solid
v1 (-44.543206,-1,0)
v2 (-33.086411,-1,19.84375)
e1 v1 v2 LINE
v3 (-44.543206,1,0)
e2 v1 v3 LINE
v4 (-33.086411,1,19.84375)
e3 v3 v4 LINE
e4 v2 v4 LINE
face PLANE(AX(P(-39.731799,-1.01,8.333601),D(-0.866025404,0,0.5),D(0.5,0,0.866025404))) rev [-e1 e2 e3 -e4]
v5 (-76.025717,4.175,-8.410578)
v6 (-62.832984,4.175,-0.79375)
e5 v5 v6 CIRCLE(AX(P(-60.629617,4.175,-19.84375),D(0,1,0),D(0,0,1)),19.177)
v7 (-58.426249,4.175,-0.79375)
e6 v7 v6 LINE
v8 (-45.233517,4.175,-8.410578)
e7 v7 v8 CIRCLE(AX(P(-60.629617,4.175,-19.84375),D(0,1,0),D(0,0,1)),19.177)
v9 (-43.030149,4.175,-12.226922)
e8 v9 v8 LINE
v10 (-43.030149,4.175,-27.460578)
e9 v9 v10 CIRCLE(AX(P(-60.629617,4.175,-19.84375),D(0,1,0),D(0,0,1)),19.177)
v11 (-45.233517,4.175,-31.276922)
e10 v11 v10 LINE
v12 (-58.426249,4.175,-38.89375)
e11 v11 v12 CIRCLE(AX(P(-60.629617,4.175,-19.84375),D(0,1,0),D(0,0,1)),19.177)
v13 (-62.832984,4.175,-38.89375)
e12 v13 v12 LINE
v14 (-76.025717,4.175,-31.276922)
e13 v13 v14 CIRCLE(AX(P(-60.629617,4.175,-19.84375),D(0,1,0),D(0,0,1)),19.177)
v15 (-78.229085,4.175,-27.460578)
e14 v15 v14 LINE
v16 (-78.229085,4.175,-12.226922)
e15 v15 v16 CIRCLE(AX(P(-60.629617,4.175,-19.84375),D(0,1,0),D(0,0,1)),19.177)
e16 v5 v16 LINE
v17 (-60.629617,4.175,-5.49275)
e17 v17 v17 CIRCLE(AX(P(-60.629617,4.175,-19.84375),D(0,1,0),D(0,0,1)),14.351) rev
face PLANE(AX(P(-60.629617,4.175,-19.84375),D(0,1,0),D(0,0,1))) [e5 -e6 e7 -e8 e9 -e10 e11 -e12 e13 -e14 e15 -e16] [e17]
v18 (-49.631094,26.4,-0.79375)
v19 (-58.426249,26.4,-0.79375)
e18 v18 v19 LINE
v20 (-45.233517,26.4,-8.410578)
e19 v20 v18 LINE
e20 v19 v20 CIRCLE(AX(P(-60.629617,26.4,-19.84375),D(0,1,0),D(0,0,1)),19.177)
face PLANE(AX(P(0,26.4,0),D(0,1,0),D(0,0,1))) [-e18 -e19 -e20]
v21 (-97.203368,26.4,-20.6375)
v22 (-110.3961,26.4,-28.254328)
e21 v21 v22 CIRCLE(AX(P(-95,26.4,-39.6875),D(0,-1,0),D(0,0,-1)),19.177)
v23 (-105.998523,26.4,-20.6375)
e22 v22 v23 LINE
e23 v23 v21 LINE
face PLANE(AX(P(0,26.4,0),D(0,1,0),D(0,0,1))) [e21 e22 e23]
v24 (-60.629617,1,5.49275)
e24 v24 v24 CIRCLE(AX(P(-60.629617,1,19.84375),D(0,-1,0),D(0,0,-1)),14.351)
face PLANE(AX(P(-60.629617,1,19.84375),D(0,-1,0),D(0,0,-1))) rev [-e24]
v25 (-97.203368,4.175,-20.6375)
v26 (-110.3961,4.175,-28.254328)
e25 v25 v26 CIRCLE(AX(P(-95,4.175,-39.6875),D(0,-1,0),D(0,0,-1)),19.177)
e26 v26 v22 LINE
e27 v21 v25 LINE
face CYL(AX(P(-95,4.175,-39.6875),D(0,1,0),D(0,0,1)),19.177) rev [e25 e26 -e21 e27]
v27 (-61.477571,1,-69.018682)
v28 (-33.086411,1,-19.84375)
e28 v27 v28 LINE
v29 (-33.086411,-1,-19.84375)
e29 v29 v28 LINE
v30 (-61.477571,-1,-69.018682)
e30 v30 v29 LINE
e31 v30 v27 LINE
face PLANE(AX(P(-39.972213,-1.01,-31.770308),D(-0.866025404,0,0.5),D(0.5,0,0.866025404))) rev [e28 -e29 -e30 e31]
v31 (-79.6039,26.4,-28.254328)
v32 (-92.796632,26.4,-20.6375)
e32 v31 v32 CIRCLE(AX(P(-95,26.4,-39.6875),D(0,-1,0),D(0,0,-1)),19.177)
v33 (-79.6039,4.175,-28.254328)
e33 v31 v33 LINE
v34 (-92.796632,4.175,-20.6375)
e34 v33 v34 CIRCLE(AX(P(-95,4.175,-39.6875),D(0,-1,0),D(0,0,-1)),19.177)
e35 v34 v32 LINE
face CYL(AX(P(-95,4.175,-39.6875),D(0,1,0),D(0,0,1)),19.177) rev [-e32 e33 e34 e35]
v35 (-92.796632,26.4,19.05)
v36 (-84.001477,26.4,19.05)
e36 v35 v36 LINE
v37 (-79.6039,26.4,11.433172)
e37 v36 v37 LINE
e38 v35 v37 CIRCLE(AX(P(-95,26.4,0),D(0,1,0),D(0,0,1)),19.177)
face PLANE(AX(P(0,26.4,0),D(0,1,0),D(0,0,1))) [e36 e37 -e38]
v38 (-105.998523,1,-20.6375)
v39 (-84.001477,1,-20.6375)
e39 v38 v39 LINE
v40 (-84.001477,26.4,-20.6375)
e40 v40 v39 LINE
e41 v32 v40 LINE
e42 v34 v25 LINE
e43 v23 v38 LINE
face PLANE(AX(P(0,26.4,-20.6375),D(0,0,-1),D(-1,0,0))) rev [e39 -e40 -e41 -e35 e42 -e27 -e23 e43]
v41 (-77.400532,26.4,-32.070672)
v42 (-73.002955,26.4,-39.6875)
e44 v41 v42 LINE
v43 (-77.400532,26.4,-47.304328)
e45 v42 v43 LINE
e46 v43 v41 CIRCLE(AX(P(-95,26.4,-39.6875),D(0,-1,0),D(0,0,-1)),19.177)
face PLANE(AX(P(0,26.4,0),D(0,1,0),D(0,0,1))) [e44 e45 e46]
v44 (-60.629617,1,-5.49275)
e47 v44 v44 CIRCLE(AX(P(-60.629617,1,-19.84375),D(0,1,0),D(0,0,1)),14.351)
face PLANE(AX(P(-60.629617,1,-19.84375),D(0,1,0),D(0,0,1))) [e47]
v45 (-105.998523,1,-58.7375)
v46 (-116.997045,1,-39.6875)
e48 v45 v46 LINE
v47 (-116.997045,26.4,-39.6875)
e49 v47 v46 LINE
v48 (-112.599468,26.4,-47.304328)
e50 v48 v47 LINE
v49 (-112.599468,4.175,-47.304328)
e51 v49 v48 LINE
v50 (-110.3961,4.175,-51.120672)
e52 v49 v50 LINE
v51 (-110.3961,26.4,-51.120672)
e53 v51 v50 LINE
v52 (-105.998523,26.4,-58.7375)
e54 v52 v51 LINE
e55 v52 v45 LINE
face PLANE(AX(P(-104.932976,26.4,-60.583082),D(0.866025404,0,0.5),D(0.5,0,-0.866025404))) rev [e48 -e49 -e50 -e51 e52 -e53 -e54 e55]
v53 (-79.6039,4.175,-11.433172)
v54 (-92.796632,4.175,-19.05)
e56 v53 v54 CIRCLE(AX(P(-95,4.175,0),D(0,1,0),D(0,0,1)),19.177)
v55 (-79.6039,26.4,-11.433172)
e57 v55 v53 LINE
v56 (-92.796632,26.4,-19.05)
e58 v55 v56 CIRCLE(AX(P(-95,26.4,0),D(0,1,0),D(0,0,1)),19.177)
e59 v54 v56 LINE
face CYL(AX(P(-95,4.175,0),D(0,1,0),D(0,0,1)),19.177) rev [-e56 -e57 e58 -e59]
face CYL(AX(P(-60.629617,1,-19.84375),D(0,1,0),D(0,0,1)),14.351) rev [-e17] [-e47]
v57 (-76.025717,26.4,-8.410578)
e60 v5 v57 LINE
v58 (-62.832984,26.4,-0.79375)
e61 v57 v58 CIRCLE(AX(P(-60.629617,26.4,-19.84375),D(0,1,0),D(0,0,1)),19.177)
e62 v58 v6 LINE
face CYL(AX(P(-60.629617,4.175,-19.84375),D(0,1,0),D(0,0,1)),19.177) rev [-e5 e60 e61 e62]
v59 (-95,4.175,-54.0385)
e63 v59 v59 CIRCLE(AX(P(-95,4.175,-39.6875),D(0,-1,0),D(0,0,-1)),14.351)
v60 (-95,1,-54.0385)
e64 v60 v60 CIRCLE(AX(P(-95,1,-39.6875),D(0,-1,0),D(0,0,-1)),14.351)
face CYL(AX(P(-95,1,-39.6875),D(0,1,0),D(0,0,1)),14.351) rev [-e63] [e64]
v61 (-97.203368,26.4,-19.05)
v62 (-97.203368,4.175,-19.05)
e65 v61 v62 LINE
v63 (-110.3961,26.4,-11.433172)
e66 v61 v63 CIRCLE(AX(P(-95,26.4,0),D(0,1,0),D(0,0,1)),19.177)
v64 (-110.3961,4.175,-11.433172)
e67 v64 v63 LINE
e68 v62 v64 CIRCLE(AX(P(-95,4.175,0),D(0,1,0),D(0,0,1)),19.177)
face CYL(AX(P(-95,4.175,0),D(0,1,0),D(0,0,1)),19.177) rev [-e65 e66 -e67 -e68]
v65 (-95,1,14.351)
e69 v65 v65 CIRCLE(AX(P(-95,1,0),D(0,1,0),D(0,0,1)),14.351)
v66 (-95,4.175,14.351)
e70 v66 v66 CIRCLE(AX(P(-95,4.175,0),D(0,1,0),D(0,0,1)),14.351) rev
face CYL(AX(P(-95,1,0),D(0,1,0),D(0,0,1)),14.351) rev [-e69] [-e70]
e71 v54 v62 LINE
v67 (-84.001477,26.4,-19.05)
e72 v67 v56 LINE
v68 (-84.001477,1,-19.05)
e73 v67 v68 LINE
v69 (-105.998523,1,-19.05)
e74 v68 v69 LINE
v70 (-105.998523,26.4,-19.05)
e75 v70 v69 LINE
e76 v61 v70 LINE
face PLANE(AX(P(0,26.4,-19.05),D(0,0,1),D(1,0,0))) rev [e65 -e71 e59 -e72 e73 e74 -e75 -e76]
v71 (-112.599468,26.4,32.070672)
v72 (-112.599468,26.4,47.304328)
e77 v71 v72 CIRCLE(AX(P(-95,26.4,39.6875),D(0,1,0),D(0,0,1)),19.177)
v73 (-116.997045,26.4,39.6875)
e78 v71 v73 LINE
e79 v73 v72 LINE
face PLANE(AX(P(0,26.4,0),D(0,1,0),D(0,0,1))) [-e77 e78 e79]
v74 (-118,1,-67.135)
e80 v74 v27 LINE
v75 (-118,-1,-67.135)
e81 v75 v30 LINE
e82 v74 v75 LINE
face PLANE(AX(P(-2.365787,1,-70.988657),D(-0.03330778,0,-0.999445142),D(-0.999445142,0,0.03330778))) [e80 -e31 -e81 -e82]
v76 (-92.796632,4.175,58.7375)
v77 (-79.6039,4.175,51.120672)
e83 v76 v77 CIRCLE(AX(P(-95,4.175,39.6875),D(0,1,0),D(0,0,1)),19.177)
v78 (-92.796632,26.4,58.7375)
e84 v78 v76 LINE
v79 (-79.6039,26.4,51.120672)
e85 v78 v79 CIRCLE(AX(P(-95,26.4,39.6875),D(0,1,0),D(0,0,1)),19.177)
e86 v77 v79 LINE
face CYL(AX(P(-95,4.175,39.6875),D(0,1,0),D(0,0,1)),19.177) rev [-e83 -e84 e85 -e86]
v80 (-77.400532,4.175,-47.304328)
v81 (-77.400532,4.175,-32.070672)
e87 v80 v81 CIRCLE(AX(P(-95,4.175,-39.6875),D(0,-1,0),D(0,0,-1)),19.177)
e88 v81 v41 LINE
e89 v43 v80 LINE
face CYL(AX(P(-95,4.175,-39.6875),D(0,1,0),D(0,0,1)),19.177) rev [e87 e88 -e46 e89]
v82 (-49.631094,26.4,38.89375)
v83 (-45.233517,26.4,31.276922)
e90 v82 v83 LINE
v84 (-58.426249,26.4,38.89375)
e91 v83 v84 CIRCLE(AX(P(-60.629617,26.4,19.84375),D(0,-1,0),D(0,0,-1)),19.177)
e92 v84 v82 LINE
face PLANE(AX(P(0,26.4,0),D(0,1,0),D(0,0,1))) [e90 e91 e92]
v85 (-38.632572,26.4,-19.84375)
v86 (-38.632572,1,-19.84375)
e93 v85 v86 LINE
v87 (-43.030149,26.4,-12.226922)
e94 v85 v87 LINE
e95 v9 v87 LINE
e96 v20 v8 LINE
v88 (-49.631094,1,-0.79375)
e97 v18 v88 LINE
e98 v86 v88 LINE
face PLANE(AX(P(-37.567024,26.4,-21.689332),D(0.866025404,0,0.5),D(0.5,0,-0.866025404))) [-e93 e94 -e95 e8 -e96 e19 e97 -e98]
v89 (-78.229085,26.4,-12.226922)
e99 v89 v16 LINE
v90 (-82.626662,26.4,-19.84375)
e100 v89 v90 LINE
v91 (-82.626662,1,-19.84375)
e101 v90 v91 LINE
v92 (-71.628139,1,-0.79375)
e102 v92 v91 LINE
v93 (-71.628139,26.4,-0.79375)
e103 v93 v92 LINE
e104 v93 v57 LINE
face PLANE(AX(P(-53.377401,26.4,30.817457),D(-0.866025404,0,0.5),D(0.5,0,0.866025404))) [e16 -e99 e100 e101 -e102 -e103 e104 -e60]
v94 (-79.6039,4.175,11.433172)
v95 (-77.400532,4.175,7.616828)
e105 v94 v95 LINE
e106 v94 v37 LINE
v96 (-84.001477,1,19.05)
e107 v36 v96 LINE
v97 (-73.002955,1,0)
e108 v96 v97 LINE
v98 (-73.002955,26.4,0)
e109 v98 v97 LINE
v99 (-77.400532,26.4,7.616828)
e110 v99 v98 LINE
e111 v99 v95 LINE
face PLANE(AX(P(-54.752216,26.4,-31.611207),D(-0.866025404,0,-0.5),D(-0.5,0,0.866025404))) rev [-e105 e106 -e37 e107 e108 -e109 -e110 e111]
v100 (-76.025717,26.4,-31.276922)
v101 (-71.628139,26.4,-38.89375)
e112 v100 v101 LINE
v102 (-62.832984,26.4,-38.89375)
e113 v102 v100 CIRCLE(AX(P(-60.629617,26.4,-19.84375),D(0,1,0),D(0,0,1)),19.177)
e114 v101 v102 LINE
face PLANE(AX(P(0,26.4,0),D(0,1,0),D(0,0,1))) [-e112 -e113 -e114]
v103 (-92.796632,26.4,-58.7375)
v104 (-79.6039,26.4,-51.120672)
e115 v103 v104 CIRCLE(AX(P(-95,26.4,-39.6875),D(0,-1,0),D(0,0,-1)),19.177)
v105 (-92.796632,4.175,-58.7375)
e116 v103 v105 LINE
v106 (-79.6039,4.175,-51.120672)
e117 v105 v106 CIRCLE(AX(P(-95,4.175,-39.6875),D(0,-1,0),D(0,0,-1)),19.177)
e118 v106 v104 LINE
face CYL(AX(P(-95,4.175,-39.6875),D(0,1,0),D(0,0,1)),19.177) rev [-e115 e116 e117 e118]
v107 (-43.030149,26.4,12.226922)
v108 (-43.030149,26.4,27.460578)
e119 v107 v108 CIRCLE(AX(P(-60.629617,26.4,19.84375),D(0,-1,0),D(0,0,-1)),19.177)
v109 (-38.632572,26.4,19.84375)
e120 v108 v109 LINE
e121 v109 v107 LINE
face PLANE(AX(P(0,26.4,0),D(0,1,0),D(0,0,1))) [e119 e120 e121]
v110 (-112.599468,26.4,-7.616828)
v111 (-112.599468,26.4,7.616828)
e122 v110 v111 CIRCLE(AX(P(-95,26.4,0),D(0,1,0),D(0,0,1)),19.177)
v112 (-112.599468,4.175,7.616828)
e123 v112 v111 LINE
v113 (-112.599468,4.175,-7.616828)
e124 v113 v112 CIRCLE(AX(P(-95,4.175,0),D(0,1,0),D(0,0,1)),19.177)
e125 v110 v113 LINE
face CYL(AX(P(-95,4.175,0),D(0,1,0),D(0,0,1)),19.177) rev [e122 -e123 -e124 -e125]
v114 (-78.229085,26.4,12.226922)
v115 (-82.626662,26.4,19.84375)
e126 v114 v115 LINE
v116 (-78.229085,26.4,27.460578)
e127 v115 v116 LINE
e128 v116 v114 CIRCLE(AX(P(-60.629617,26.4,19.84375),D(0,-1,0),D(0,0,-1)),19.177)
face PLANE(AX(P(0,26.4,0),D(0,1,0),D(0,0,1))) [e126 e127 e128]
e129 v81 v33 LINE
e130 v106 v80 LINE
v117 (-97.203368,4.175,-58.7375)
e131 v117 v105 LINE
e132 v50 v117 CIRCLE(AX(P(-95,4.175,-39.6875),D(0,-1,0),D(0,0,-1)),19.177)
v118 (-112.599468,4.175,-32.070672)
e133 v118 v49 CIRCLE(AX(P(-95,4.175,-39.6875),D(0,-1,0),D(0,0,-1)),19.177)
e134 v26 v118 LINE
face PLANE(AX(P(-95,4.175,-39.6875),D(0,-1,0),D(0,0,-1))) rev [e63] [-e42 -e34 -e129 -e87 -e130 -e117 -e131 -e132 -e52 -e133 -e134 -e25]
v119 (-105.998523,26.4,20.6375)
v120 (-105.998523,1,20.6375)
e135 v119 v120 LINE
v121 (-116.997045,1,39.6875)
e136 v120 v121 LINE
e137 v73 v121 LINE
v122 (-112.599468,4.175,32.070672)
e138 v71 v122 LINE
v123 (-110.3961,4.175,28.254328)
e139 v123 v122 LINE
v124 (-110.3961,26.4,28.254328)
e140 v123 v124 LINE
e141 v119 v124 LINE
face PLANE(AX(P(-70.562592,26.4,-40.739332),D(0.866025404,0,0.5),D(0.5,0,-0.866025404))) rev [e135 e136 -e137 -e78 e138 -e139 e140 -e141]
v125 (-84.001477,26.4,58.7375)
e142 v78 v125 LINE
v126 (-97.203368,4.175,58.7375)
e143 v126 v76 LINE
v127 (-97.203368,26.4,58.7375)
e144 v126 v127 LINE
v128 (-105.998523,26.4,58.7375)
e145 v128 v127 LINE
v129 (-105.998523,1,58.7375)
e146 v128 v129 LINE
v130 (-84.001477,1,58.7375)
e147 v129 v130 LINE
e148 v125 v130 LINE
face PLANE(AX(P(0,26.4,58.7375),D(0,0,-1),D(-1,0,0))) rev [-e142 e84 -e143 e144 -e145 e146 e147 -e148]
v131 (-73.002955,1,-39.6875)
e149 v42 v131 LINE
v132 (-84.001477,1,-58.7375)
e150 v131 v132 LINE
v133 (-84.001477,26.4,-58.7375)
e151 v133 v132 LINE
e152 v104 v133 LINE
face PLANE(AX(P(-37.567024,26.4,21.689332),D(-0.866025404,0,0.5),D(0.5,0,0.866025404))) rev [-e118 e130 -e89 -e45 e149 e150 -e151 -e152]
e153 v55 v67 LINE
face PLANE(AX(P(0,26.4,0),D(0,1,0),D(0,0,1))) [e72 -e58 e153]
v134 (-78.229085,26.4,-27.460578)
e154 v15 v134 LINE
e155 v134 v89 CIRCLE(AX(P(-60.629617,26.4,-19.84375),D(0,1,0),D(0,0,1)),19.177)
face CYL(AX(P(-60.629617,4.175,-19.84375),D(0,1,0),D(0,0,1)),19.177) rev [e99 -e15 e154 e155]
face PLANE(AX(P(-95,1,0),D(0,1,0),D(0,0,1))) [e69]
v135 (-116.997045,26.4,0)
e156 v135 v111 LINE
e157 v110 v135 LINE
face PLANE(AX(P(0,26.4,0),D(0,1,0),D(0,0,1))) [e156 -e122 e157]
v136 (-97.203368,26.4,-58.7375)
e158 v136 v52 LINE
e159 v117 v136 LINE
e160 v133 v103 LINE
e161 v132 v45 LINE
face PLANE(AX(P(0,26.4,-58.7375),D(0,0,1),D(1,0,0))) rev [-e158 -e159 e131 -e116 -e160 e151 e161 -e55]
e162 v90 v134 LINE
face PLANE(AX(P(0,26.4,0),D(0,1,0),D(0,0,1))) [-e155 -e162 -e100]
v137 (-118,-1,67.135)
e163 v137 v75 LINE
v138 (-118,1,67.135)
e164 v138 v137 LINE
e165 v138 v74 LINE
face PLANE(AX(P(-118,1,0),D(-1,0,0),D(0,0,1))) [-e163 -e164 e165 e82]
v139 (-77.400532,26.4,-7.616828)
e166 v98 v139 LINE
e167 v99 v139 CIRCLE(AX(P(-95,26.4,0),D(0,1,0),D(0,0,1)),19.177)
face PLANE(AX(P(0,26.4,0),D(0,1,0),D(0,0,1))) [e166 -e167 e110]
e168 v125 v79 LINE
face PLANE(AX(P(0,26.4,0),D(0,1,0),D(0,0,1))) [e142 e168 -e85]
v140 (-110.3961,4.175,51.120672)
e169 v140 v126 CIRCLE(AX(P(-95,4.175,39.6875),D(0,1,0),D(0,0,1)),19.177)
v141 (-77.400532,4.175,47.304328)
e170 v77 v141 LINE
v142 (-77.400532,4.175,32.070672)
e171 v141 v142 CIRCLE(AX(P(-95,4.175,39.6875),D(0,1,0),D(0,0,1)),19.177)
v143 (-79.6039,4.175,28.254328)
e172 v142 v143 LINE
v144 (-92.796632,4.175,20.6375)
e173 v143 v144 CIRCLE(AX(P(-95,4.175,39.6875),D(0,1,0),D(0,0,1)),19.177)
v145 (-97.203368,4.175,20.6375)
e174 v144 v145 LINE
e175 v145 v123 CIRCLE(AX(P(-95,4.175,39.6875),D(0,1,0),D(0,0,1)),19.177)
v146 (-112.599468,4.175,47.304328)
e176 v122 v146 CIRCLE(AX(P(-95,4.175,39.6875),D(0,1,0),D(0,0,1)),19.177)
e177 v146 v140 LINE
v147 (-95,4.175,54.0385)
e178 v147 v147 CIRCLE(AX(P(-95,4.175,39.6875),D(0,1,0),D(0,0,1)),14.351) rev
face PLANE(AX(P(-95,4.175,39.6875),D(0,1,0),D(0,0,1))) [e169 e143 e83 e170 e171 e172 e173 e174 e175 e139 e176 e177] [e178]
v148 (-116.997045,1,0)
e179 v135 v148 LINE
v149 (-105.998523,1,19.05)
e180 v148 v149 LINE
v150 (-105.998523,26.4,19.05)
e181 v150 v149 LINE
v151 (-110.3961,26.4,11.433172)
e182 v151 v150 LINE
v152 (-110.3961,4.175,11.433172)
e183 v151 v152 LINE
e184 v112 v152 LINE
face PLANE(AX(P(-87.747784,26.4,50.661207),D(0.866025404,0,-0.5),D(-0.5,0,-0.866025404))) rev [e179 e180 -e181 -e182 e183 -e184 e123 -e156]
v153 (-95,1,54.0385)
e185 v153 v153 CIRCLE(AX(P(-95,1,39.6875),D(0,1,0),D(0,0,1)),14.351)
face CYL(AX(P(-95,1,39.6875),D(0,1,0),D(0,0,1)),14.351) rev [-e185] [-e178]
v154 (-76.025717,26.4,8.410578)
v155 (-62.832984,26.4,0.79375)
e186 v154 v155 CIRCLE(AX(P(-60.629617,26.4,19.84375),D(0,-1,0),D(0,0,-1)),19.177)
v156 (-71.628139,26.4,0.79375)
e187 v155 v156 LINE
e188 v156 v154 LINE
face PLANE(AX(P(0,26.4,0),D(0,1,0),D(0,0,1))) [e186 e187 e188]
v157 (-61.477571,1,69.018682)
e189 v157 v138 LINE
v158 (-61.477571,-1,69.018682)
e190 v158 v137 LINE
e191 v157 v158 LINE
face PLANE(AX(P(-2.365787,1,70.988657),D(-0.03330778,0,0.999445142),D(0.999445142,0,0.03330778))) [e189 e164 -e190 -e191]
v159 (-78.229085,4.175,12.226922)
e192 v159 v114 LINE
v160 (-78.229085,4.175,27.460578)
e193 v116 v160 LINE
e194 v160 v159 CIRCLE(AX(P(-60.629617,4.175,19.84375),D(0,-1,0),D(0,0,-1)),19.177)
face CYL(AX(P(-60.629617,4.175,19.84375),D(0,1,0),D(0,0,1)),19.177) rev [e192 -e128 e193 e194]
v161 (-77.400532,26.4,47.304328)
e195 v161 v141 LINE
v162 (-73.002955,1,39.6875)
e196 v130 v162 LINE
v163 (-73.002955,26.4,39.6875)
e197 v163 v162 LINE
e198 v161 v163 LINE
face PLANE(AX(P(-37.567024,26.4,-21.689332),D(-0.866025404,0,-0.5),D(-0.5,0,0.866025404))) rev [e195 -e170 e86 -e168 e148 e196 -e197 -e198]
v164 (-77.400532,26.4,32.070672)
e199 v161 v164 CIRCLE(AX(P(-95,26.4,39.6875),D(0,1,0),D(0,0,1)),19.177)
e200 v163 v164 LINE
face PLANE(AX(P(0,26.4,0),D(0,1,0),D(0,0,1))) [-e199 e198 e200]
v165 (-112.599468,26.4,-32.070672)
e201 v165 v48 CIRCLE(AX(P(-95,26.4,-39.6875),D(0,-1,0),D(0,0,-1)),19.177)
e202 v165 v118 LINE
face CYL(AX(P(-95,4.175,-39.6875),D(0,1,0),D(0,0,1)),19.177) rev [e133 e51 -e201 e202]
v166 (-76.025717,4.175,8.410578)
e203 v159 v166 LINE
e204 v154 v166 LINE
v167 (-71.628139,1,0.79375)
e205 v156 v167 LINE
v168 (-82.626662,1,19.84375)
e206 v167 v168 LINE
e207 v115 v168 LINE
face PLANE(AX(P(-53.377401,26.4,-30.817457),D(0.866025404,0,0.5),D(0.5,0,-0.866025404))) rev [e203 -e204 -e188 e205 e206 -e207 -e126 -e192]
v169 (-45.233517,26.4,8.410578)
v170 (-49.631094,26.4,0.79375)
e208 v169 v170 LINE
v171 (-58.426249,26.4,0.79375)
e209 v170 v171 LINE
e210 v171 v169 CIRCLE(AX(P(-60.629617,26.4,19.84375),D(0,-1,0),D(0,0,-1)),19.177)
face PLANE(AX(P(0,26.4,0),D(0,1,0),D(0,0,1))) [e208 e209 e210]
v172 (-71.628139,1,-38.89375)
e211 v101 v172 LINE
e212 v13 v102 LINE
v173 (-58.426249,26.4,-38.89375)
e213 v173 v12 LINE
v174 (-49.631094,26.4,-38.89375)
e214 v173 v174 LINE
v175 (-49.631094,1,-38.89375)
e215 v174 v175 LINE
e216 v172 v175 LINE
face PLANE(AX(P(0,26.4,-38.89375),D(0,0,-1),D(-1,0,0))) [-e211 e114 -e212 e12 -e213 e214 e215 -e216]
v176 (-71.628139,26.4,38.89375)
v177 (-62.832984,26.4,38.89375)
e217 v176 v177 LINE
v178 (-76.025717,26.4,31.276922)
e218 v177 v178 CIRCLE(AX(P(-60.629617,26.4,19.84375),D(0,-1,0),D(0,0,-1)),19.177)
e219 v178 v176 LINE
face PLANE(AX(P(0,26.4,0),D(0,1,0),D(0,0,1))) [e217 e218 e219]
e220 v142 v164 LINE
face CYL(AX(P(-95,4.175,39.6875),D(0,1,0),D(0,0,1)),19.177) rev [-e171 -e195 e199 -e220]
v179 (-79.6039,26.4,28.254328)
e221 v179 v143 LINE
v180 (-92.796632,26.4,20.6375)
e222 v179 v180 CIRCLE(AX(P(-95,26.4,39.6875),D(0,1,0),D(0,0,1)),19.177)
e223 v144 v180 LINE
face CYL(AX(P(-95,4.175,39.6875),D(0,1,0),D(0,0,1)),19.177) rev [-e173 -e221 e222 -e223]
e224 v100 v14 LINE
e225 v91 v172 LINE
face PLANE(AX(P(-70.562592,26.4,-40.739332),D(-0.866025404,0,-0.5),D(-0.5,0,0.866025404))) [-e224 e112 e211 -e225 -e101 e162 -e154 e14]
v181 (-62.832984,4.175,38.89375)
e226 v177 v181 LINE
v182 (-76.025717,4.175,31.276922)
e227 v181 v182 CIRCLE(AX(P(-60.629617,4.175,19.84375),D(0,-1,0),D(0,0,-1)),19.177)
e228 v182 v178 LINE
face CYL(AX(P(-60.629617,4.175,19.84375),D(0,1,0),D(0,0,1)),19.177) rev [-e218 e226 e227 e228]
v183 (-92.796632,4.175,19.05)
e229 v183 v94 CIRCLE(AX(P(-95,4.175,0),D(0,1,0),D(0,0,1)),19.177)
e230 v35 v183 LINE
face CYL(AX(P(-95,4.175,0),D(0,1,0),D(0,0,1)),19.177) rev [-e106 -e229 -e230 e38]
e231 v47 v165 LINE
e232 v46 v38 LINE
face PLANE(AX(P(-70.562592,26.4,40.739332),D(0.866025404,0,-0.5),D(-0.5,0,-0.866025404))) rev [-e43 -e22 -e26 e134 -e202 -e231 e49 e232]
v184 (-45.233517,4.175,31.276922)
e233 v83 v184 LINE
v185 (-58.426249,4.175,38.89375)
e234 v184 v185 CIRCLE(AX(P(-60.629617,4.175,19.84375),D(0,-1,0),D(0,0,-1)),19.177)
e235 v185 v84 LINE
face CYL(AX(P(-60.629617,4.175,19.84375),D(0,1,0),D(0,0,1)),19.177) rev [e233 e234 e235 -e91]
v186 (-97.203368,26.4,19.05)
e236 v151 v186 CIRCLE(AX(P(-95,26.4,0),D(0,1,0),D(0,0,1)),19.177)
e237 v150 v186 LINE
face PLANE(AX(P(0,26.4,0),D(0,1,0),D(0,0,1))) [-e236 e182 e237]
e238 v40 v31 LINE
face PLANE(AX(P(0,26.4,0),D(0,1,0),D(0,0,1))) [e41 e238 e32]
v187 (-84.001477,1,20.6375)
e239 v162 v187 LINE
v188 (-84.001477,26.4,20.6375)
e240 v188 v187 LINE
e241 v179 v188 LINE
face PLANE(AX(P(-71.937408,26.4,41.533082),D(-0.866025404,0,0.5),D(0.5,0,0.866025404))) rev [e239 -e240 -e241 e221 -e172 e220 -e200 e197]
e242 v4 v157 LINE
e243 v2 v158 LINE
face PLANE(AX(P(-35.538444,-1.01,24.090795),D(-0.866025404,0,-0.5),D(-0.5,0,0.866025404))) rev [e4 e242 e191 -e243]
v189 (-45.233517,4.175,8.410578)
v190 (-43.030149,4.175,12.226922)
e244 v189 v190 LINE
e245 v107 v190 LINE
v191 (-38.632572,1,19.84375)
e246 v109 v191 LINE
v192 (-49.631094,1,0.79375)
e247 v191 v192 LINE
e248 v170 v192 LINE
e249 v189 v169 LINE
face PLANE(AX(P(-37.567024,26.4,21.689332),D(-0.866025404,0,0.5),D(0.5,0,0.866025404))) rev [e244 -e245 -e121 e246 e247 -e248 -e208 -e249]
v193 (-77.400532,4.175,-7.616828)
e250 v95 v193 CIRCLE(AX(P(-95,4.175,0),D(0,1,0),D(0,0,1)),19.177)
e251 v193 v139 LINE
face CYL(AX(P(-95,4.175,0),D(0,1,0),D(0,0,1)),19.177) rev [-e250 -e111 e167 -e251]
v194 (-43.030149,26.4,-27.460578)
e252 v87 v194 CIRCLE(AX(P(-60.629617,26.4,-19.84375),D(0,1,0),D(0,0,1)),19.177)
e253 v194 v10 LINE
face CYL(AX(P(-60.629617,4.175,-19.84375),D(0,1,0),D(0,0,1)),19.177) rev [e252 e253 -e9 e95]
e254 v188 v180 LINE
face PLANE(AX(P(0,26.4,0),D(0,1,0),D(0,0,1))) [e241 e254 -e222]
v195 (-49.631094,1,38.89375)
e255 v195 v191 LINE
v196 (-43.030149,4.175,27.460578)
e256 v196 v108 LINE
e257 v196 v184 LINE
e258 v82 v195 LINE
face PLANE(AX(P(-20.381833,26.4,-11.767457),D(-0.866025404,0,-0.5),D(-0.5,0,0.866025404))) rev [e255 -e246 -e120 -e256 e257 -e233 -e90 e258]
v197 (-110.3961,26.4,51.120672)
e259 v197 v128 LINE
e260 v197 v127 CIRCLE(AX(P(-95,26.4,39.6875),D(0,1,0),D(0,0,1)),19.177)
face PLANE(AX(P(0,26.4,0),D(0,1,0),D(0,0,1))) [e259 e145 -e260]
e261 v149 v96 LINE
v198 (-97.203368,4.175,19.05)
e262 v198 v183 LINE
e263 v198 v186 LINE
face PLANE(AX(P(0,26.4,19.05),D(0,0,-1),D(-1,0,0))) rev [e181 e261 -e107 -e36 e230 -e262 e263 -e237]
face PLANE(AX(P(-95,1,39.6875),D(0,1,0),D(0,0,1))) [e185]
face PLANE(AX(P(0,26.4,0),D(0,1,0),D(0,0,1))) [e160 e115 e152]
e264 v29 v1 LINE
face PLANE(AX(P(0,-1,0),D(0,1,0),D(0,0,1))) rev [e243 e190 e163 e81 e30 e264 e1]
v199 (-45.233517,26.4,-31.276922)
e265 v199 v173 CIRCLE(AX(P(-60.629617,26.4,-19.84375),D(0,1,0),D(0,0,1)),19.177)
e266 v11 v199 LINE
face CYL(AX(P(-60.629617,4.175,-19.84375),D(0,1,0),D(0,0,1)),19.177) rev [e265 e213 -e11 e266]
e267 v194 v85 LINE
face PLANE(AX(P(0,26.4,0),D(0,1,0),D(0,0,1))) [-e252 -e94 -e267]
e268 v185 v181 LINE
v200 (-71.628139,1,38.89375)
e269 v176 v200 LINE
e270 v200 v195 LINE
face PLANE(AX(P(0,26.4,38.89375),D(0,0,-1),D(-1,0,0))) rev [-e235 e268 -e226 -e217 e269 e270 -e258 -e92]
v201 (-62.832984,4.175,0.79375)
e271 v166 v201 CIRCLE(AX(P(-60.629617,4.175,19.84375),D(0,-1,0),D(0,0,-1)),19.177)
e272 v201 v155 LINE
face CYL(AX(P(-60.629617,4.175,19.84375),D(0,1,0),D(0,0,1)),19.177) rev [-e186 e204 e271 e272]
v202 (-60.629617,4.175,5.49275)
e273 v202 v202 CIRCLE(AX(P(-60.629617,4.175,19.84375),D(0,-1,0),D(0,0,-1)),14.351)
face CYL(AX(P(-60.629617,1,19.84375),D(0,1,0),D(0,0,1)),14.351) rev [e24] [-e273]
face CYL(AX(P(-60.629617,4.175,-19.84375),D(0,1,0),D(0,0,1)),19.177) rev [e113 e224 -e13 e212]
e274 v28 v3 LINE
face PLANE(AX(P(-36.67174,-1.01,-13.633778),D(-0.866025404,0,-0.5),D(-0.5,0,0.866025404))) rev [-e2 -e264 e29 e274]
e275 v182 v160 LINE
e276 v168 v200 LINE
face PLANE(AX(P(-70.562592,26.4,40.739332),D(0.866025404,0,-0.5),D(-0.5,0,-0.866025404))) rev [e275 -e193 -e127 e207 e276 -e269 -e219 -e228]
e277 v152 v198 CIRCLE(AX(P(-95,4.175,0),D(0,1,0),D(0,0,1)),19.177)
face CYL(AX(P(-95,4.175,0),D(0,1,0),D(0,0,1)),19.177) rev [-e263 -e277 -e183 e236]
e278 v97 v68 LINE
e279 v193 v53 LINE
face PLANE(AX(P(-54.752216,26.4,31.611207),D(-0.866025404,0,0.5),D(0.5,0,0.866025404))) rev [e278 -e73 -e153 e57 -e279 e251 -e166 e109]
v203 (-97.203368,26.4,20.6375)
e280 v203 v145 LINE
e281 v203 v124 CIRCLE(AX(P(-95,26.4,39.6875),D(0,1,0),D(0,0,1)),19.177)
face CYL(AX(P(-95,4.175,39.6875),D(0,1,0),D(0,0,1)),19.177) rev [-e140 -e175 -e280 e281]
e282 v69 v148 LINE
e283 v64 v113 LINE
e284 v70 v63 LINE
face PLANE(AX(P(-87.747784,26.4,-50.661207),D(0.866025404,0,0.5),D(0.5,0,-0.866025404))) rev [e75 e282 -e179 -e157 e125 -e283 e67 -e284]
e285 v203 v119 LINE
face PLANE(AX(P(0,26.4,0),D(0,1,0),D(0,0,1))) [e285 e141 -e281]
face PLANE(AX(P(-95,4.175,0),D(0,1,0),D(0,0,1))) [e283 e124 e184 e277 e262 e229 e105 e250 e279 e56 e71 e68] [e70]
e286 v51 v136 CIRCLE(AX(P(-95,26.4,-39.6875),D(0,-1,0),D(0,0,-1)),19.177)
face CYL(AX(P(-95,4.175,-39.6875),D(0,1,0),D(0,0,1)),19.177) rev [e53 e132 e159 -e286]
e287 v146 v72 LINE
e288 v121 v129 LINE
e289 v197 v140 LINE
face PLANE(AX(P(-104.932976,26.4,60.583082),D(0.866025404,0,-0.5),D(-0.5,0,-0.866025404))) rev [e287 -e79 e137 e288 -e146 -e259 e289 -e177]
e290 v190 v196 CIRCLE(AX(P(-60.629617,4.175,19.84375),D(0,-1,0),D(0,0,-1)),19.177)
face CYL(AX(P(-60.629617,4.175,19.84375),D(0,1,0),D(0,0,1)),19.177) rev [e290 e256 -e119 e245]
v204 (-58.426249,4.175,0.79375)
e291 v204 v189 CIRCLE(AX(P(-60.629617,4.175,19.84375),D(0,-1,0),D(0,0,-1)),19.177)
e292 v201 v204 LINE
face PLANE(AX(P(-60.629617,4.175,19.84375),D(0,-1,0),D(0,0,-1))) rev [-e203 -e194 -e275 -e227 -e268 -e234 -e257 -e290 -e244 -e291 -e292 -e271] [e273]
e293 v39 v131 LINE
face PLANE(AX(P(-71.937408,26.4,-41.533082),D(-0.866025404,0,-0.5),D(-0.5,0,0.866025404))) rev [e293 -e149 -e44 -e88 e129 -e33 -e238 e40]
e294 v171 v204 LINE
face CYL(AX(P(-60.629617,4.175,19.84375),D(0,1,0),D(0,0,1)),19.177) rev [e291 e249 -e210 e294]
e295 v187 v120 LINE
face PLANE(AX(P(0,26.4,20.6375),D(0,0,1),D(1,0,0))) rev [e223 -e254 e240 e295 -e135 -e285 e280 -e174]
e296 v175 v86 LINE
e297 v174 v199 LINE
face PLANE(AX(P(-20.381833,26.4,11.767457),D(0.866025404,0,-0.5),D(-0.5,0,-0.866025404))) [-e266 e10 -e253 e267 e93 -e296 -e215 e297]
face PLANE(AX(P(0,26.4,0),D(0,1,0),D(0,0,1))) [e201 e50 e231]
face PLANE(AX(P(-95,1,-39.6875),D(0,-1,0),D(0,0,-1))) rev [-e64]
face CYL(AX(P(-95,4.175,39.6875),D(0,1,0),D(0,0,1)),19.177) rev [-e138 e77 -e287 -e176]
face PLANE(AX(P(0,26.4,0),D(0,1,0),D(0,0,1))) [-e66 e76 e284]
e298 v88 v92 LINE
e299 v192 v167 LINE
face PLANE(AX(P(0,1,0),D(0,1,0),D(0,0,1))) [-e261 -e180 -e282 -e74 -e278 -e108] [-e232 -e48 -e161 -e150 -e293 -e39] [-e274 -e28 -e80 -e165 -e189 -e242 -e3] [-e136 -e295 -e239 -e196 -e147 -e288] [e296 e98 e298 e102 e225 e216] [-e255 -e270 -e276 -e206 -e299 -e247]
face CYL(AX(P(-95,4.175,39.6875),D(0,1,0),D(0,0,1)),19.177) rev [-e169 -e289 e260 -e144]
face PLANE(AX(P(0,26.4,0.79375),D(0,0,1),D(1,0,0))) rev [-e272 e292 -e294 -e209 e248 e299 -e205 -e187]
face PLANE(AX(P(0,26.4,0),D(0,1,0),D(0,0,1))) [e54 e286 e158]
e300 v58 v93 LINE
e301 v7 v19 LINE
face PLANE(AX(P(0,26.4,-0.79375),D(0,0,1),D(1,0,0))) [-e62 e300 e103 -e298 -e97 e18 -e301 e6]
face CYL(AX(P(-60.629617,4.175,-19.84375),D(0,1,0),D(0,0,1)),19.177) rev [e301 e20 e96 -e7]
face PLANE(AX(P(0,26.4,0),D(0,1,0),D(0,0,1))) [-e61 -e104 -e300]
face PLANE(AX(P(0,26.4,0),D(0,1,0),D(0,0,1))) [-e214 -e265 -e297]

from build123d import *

# Parameters (mm, degrees)
BOSS_EXTRUDE1_DEPTH = 1
BOSS_EXTRUDE2_DEPTH = 25.4
SKETCH4_R           = 14.351
CUT_EXTRUDE1_DEPTH  = 25.4
SKETCH4_4_R         = 19.177
CUT_EXTRUDE2_DEPTH  = 22.225
LPATTERN1_COUNT     = 3
LPATTERN1_PITCH     = 78
SPLIT3_START        = -1
SPLIT3_DEPTH        = 27.4


# Read off the part's stored shape, not the designer's step: Split3
with BuildPart() as part:
    # Sketch1 → Boss-Extrude1 (new, symmetric)
    with BuildSketch(Plane(origin=(0, 0, 0), x_dir=(1, 0, 0), z_dir=(0, 1, 0))):
        Polygon((118, 0), (-118, 0), (-118, -67.135), (118, -75), align=None)
        Polygon((-118, 67.135), (-118, 0), (118, 0), (118, 75), align=None)
    extrude(amount=BOSS_EXTRUDE1_DEPTH, both=True)

    # Sketch3 → Boss-Extrude2 (add)
    with BuildSketch(Plane(origin=(0, 1, 0), x_dir=(1, 0, 0), z_dir=(0, 1, 0))):
        Polygon((-84.001477372, 20.6375), (-73.002954744, 39.6875), (-84.001477372, 58.7375), (-105.998522628, 58.7375), (-116.997045256, 39.6875), (-105.998522628, 20.6375), align=None)
        Polygon((-38.632571531, 19.84375), (-49.631094159, 0.79375), (-71.628139415, 0.79375), (-82.626662043, 19.84375), (-71.628139415, 38.89375), (-49.631094159, 38.89375), align=None)
        Polygon((-84.001477372, -19.05), (-73.002954744, 0), (-84.001477372, 19.05), (-105.998522628, 19.05), (-116.997045256, 0), (-105.998522628, -19.05), align=None)
        Polygon((-105.998522628, -58.7375), (-84.001477372, -58.7375), (-73.002954744, -39.6875), (-84.001477372, -20.6375), (-105.998522628, -20.6375), (-116.997045256, -39.6875), align=None)
        Polygon((-71.628139415, -38.89375), (-49.631094159, -38.89375), (-38.632571531, -19.84375), (-49.631094159, -0.79375), (-71.628139415, -0.79375), (-82.626662043, -19.84375), align=None)
    boss_extrude2 = extrude(amount=BOSS_EXTRUDE2_DEPTH)

    # Sketch4 → Cut-Extrude1 (cut)
    with BuildSketch(Plane(origin=(0, 26.4, 0), x_dir=(1, 0, 0), z_dir=(0, 1, 0))):
        with Locations(Location((-95, 0, 0), (0, 0, 270))):
            Circle(SKETCH4_R)
        with Locations(Location((-95, -39.6875, 0), (0, 0, 270))):
            Circle(SKETCH4_R)
        with Locations(Location((-95, 39.6875, 0), (0, 0, 90))):
            Circle(SKETCH4_R)
        with Locations(Location((-60.629616787, 19.84375, 0), (0, 0, 270))):
            Circle(SKETCH4_R)
        with Locations(Location((-60.629616787, -19.84375, 0), (0, 0, 90))):
            Circle(SKETCH4_R)
    cut_extrude1 = extrude(amount=-CUT_EXTRUDE1_DEPTH, mode=Mode.SUBTRACT)

    # Sketch4<4> → Cut-Extrude2 (cut)
    with BuildSketch(Plane(origin=(0, 26.4, 0), x_dir=(1, 0, 0), z_dir=(0, 1, 0))):
        with Locations((-95, 0)):
            Circle(SKETCH4_4_R)
        with Locations((-95, -39.6875)):
            Circle(SKETCH4_4_R)
        with Locations((-95, 39.6875)):
            Circle(SKETCH4_4_R)
        with Locations((-60.629616787, 19.84375)):
            Circle(SKETCH4_4_R)
        with Locations((-60.629616787, -19.84375)):
            Circle(SKETCH4_4_R)
    cut_extrude2 = extrude(amount=-CUT_EXTRUDE2_DEPTH, mode=Mode.SUBTRACT)

    # LPattern1: Boss-Extrude2, Cut-Extrude1, Cut-Extrude2 ×3
    with Locations(*[(i * LPATTERN1_PITCH, 0, 0) for i in range(1, LPATTERN1_COUNT)]):
        add(boss_extrude2)
        add(cut_extrude1, mode=Mode.SUBTRACT)
        add(cut_extrude2, mode=Mode.SUBTRACT)

    # Split3 outline → Split3 (cut)
    with BuildSketch(Plane(origin=(0, 0, 0), x_dir=(1, 0, 0), z_dir=(0, 1, 0)).offset(SPLIT3_START)):
        Polygon((-44.543205596, 0), (-33.086411192, -19.84375), (-61.477571296, -69.018681787), (118, -75), (118, 75), (-61.477571296, 69.018681787), (-33.086411192, 19.84375), align=None)
    extrude(amount=SPLIT3_DEPTH, mode=Mode.SUBTRACT)


solid = part.part
